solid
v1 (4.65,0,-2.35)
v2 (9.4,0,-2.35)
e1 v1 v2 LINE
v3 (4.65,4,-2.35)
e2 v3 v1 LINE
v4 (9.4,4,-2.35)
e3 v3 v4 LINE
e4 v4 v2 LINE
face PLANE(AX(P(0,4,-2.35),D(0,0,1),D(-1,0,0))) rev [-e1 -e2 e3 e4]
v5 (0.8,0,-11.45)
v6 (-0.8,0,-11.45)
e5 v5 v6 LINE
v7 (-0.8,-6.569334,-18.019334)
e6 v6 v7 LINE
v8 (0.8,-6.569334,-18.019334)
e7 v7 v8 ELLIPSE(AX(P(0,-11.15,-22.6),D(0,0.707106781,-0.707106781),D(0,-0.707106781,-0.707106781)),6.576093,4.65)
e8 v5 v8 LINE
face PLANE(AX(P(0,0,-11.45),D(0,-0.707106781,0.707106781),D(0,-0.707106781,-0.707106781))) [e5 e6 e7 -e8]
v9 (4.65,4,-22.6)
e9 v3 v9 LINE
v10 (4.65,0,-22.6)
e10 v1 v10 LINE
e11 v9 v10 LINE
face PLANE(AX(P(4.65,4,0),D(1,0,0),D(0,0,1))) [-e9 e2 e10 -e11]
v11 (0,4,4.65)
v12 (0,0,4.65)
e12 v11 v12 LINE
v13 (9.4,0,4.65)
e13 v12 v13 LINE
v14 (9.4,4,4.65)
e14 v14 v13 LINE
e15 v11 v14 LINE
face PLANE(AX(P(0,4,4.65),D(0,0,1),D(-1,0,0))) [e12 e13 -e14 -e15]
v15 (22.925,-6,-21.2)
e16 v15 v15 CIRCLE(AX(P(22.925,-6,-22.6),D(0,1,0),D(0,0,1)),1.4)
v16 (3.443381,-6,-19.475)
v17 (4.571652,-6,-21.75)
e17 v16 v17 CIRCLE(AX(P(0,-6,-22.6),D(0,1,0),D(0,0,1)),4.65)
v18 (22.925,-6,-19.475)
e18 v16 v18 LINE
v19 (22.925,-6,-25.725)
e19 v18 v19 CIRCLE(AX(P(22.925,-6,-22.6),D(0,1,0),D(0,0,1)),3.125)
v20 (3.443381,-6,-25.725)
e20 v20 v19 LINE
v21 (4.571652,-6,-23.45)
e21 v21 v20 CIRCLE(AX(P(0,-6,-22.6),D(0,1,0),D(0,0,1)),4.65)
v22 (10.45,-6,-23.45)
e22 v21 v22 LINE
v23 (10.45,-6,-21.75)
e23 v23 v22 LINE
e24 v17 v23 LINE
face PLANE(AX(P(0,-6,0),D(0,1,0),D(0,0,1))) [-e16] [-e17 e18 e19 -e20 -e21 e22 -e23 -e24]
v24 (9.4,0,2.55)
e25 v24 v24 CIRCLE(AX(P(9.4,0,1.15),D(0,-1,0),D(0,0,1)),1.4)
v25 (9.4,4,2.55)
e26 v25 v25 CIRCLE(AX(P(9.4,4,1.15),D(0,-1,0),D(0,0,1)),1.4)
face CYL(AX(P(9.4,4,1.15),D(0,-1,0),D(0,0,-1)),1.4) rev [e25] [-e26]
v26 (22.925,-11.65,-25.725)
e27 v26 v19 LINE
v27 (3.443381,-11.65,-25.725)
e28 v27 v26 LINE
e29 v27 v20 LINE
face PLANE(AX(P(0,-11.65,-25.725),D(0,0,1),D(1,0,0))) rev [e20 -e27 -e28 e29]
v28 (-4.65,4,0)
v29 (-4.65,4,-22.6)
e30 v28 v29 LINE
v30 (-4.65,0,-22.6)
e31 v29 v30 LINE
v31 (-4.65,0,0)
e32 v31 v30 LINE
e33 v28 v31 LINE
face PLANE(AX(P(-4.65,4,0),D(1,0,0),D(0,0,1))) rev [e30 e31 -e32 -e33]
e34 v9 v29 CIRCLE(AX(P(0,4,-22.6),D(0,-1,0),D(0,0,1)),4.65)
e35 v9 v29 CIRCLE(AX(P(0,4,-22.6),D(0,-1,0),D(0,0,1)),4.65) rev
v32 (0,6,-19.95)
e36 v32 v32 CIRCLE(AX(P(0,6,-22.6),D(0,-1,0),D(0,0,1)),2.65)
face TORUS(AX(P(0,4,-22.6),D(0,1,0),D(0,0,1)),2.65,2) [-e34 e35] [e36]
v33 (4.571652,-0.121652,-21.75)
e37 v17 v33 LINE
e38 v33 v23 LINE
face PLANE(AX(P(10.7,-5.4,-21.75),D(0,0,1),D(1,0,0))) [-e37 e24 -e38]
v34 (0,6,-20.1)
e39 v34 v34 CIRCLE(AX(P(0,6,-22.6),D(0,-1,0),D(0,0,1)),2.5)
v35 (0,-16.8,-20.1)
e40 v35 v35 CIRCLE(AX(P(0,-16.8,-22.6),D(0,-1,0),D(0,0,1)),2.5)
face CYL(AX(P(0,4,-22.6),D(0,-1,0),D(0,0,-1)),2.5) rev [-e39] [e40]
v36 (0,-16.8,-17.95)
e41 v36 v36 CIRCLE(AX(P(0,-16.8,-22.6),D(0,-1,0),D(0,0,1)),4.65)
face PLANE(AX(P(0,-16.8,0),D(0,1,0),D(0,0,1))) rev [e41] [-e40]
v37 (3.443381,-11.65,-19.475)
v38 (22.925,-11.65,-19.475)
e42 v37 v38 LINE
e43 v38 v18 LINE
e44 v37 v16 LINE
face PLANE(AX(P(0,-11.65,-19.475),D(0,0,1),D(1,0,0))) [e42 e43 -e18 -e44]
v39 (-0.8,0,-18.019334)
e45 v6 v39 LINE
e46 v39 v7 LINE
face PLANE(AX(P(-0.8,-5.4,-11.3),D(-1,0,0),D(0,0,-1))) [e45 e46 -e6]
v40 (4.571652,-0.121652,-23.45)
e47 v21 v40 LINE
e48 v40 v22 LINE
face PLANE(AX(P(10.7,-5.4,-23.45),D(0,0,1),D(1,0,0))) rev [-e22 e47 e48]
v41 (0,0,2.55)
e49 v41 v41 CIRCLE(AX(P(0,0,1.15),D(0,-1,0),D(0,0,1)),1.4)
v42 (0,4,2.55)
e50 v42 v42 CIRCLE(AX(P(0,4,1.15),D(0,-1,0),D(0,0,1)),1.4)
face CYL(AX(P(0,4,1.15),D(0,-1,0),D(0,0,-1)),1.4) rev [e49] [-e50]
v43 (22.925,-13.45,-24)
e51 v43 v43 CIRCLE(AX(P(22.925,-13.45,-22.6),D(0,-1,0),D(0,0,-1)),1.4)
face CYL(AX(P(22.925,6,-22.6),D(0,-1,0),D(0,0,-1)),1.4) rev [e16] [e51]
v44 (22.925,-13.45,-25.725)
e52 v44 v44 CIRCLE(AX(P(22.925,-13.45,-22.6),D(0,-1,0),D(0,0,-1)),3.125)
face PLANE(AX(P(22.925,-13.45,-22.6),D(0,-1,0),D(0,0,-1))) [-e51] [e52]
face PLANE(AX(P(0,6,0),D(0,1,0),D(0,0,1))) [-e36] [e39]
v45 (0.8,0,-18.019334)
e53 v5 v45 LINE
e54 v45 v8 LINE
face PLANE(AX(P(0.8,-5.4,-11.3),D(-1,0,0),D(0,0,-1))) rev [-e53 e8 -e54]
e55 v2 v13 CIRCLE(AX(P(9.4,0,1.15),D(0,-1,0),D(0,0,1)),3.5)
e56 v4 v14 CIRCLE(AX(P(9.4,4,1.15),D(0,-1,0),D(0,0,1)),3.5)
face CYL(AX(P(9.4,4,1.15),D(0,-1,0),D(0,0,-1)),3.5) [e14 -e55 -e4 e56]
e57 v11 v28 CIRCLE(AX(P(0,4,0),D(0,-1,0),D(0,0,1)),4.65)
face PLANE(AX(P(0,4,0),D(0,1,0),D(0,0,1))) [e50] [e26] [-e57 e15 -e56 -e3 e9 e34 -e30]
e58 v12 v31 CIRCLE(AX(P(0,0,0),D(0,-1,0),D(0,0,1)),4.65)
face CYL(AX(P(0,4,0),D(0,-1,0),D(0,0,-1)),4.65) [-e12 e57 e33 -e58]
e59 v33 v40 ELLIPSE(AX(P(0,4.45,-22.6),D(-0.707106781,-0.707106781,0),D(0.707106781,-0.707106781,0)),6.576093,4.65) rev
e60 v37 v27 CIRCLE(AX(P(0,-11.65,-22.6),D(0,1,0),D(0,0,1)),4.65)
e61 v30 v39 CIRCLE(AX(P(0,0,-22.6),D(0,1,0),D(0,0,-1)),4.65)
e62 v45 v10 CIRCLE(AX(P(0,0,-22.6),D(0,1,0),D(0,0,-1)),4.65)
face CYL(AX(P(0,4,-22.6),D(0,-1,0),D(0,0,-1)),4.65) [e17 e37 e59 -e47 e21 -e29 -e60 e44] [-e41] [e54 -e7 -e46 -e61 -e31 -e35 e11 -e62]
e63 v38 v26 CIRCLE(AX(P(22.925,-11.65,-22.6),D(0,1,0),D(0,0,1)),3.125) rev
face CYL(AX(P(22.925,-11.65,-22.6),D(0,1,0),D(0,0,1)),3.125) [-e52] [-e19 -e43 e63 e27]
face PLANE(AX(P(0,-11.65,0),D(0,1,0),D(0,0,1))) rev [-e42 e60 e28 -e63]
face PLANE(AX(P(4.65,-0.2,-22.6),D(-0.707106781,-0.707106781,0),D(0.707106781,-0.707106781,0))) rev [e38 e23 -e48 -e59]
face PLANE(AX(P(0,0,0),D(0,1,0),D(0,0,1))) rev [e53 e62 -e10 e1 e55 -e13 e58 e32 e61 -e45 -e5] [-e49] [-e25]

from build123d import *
from build123d.topology import SkipClean

# Parameters (mm, degrees)
SKETCH2_R           = 1.4
SKETCH2_R_2         = 2.5
BOSS_EXTRUDE1_DEPTH = 4
BOSS_EXTRUDE2_START = 16.8
SKETCH3_R           = 4.65
SKETCH3_R_2         = 2.5
BOSS_EXTRUDE2_DEPTH = 16.8
SKETCH5_R           = 4.65
SKETCH5_R_2         = 2.5
BOSS_EXTRUDE3_DEPTH = 2
FILLET1_R           = 2
RIB1_REACH          = 36.514
SKETCH6_WALL_W      = 80.220281068
SKETCH6_WALL_H      = 1.6
BOSS_EXTRUDE4_DEPTH = 5.65
SKETCH8_R           = 3.125
BOSS_EXTRUDE5_DEPTH = 1.8
SKETCH9_R           = 1.4
CUT_EXTRUDE1_DEPTH  = 43.420130834
RIB2_REACH          = 43.272
SKETCH10_WALL_W     = 92.747093244
SKETCH10_WALL_H     = 1.7


with BuildPart() as part:
    # Sketch2 → Boss-Extrude1 (new body)
    with BuildSketch(Plane(origin=(0, 0, 0), x_dir=(1, 0, 0), z_dir=(0, 1, 0))):
        with BuildLine():
            Line((-9.4, -4.65), (0, -4.65))
            ThreePointArc((0, -4.65), (3.288046533, -3.288046533), (4.65, 0))
            Line((4.65, 0), (4.65, 22.6))
            ThreePointArc((4.65, 22.6), (0, 27.25), (-4.65, 22.6))
            Line((-4.65, 22.6), (-4.65, 2.35))
            Line((-4.65, 2.35), (-9.4, 2.35))
            ThreePointArc((-9.4, 2.35), (-12.9, -1.15), (-9.4, -4.65))
        make_face()
        with Locations(Location((-9.4, -1.15, 0), (0, 0, 270))):
            Circle(SKETCH2_R, mode=Mode.SUBTRACT)
        with Locations(Location((0, -1.15, 0), (0, 0, 270))):
            Circle(SKETCH2_R, mode=Mode.SUBTRACT)
        with Locations(Location((0, 22.6, 0), (0, 0, 270))):
            Circle(SKETCH2_R_2, mode=Mode.SUBTRACT)
    extrude(amount=BOSS_EXTRUDE1_DEPTH)

    # Sketch3 → Boss-Extrude2 (add)
    with BuildSketch(Plane.XZ.offset(BOSS_EXTRUDE2_START)):
        with Locations((0, -22.6)):
            Circle(SKETCH3_R)
        with Locations(Location((0, -22.6, 0), (0, 0, 90))):
            Circle(SKETCH3_R_2, mode=Mode.SUBTRACT)
    extrude(amount=-BOSS_EXTRUDE2_DEPTH)

    # Sketch5 → Boss-Extrude3 (add)
    with SkipClean():  # the faces are left unmerged after this step: merging them gives an invalid solid
        with BuildSketch(Plane(origin=(0, 4, 0), x_dir=(1, 0, 0), z_dir=(0, 1, 0))):
            with Locations(Location((0, 22.6, 0), (0, 0, 270))):
                Circle(SKETCH5_R)
            with Locations(Location((0, 22.6, 0), (0, 0, 270))):
                Circle(SKETCH5_R_2, mode=Mode.SUBTRACT)
        extrude(amount=BOSS_EXTRUDE3_DEPTH)

    # Fillet1
    fillet1_edges = [part.edges().sort_by_distance(p)[0] for p in [
        (0, 6, -27.25),
    ]]
    fillet(fillet1_edges, radius=FILLET1_R - 0.0001)  # a hair under: the kernel refuses the full size

    # Sketch6 wall → Rib1 (add, up to next)
    with BuildSketch(Plane(origin=(0, -3.25, -14.7), x_dir=(0, -0.707106781187, -0.707106781187), z_dir=(0, 0.707106781187, -0.707106781187)), mode=Mode.PRIVATE) as rib1_sk1:
        Rectangle(SKETCH6_WALL_W, SKETCH6_WALL_H)
    rib1_tool1 = extrude(rib1_sk1.sketch, amount=RIB1_REACH, mode=Mode.PRIVATE) - part.part
    add(rib1_tool1.solids().sort_by_distance((0, -3.25, -14.7))[0])


with BuildPart() as body_2:
    # Mirror1: mirrored copy
    add(part.part.mirror(Plane(origin=(0, 0, 0), x_dir=(0, 0, 1), z_dir=(1, 0, 0))))

    # Sketch7 → Boss-Extrude4 (add)
    with BuildSketch(Plane(origin=(0, -6, 0), x_dir=(1, 0, 0), z_dir=(0, 1, 0))):
        with BuildLine():
            Line((22.925, 25.725), (3.443381332, 25.725))
            ThreePointArc((3.443381332, 25.725), (4.65, 22.6), (3.443381332, 19.475))
            Line((3.443381332, 19.475), (22.925, 19.475))
            ThreePointArc((22.925, 19.475), (26.05, 22.6), (22.925, 25.725))
        make_face()
    extrude(amount=-BOSS_EXTRUDE4_DEPTH)

    # Sketch8 → Boss-Extrude5 (add)
    with SkipClean():  # the faces are left unmerged after this step: merging them gives an invalid solid
        with BuildSketch(Plane.XZ.offset(11.65)):
            with Locations(Location((22.925, -22.6, 0), (0, 0, 270))):
                Circle(SKETCH8_R)
        extrude(amount=BOSS_EXTRUDE5_DEPTH)
    add(body_2.part.scale(1), mode=Mode.REPLACE)  # the faces are merged on a copy

    # Sketch9 → Cut-Extrude1 (cut, through all)
    with BuildSketch(Plane.XZ.offset(13.45)):
        with Locations(Location((22.925, -22.6, 0), (0, 0, 270))):
            Circle(SKETCH9_R)
    extrude(amount=-CUT_EXTRUDE1_DEPTH, mode=Mode.SUBTRACT)

    # Sketch10 wall → Rib2 (add, up to next)
    with BuildSketch(Plane(origin=(7.55, -3.1, -22.6), x_dir=(0.707106781187, -0.707106781187, 0), z_dir=(0.707106781187, 0.707106781187, 0)), mode=Mode.PRIVATE) as rib2_sk1:
        Rectangle(SKETCH10_WALL_W, SKETCH10_WALL_H)
    rib2_tool1 = extrude(rib2_sk1.sketch, amount=-RIB2_REACH, mode=Mode.PRIVATE) - body_2.part
    add(rib2_tool1.solids().sort_by_distance((7.55, -3.1, -22.6))[0])


solid = body_2.part
